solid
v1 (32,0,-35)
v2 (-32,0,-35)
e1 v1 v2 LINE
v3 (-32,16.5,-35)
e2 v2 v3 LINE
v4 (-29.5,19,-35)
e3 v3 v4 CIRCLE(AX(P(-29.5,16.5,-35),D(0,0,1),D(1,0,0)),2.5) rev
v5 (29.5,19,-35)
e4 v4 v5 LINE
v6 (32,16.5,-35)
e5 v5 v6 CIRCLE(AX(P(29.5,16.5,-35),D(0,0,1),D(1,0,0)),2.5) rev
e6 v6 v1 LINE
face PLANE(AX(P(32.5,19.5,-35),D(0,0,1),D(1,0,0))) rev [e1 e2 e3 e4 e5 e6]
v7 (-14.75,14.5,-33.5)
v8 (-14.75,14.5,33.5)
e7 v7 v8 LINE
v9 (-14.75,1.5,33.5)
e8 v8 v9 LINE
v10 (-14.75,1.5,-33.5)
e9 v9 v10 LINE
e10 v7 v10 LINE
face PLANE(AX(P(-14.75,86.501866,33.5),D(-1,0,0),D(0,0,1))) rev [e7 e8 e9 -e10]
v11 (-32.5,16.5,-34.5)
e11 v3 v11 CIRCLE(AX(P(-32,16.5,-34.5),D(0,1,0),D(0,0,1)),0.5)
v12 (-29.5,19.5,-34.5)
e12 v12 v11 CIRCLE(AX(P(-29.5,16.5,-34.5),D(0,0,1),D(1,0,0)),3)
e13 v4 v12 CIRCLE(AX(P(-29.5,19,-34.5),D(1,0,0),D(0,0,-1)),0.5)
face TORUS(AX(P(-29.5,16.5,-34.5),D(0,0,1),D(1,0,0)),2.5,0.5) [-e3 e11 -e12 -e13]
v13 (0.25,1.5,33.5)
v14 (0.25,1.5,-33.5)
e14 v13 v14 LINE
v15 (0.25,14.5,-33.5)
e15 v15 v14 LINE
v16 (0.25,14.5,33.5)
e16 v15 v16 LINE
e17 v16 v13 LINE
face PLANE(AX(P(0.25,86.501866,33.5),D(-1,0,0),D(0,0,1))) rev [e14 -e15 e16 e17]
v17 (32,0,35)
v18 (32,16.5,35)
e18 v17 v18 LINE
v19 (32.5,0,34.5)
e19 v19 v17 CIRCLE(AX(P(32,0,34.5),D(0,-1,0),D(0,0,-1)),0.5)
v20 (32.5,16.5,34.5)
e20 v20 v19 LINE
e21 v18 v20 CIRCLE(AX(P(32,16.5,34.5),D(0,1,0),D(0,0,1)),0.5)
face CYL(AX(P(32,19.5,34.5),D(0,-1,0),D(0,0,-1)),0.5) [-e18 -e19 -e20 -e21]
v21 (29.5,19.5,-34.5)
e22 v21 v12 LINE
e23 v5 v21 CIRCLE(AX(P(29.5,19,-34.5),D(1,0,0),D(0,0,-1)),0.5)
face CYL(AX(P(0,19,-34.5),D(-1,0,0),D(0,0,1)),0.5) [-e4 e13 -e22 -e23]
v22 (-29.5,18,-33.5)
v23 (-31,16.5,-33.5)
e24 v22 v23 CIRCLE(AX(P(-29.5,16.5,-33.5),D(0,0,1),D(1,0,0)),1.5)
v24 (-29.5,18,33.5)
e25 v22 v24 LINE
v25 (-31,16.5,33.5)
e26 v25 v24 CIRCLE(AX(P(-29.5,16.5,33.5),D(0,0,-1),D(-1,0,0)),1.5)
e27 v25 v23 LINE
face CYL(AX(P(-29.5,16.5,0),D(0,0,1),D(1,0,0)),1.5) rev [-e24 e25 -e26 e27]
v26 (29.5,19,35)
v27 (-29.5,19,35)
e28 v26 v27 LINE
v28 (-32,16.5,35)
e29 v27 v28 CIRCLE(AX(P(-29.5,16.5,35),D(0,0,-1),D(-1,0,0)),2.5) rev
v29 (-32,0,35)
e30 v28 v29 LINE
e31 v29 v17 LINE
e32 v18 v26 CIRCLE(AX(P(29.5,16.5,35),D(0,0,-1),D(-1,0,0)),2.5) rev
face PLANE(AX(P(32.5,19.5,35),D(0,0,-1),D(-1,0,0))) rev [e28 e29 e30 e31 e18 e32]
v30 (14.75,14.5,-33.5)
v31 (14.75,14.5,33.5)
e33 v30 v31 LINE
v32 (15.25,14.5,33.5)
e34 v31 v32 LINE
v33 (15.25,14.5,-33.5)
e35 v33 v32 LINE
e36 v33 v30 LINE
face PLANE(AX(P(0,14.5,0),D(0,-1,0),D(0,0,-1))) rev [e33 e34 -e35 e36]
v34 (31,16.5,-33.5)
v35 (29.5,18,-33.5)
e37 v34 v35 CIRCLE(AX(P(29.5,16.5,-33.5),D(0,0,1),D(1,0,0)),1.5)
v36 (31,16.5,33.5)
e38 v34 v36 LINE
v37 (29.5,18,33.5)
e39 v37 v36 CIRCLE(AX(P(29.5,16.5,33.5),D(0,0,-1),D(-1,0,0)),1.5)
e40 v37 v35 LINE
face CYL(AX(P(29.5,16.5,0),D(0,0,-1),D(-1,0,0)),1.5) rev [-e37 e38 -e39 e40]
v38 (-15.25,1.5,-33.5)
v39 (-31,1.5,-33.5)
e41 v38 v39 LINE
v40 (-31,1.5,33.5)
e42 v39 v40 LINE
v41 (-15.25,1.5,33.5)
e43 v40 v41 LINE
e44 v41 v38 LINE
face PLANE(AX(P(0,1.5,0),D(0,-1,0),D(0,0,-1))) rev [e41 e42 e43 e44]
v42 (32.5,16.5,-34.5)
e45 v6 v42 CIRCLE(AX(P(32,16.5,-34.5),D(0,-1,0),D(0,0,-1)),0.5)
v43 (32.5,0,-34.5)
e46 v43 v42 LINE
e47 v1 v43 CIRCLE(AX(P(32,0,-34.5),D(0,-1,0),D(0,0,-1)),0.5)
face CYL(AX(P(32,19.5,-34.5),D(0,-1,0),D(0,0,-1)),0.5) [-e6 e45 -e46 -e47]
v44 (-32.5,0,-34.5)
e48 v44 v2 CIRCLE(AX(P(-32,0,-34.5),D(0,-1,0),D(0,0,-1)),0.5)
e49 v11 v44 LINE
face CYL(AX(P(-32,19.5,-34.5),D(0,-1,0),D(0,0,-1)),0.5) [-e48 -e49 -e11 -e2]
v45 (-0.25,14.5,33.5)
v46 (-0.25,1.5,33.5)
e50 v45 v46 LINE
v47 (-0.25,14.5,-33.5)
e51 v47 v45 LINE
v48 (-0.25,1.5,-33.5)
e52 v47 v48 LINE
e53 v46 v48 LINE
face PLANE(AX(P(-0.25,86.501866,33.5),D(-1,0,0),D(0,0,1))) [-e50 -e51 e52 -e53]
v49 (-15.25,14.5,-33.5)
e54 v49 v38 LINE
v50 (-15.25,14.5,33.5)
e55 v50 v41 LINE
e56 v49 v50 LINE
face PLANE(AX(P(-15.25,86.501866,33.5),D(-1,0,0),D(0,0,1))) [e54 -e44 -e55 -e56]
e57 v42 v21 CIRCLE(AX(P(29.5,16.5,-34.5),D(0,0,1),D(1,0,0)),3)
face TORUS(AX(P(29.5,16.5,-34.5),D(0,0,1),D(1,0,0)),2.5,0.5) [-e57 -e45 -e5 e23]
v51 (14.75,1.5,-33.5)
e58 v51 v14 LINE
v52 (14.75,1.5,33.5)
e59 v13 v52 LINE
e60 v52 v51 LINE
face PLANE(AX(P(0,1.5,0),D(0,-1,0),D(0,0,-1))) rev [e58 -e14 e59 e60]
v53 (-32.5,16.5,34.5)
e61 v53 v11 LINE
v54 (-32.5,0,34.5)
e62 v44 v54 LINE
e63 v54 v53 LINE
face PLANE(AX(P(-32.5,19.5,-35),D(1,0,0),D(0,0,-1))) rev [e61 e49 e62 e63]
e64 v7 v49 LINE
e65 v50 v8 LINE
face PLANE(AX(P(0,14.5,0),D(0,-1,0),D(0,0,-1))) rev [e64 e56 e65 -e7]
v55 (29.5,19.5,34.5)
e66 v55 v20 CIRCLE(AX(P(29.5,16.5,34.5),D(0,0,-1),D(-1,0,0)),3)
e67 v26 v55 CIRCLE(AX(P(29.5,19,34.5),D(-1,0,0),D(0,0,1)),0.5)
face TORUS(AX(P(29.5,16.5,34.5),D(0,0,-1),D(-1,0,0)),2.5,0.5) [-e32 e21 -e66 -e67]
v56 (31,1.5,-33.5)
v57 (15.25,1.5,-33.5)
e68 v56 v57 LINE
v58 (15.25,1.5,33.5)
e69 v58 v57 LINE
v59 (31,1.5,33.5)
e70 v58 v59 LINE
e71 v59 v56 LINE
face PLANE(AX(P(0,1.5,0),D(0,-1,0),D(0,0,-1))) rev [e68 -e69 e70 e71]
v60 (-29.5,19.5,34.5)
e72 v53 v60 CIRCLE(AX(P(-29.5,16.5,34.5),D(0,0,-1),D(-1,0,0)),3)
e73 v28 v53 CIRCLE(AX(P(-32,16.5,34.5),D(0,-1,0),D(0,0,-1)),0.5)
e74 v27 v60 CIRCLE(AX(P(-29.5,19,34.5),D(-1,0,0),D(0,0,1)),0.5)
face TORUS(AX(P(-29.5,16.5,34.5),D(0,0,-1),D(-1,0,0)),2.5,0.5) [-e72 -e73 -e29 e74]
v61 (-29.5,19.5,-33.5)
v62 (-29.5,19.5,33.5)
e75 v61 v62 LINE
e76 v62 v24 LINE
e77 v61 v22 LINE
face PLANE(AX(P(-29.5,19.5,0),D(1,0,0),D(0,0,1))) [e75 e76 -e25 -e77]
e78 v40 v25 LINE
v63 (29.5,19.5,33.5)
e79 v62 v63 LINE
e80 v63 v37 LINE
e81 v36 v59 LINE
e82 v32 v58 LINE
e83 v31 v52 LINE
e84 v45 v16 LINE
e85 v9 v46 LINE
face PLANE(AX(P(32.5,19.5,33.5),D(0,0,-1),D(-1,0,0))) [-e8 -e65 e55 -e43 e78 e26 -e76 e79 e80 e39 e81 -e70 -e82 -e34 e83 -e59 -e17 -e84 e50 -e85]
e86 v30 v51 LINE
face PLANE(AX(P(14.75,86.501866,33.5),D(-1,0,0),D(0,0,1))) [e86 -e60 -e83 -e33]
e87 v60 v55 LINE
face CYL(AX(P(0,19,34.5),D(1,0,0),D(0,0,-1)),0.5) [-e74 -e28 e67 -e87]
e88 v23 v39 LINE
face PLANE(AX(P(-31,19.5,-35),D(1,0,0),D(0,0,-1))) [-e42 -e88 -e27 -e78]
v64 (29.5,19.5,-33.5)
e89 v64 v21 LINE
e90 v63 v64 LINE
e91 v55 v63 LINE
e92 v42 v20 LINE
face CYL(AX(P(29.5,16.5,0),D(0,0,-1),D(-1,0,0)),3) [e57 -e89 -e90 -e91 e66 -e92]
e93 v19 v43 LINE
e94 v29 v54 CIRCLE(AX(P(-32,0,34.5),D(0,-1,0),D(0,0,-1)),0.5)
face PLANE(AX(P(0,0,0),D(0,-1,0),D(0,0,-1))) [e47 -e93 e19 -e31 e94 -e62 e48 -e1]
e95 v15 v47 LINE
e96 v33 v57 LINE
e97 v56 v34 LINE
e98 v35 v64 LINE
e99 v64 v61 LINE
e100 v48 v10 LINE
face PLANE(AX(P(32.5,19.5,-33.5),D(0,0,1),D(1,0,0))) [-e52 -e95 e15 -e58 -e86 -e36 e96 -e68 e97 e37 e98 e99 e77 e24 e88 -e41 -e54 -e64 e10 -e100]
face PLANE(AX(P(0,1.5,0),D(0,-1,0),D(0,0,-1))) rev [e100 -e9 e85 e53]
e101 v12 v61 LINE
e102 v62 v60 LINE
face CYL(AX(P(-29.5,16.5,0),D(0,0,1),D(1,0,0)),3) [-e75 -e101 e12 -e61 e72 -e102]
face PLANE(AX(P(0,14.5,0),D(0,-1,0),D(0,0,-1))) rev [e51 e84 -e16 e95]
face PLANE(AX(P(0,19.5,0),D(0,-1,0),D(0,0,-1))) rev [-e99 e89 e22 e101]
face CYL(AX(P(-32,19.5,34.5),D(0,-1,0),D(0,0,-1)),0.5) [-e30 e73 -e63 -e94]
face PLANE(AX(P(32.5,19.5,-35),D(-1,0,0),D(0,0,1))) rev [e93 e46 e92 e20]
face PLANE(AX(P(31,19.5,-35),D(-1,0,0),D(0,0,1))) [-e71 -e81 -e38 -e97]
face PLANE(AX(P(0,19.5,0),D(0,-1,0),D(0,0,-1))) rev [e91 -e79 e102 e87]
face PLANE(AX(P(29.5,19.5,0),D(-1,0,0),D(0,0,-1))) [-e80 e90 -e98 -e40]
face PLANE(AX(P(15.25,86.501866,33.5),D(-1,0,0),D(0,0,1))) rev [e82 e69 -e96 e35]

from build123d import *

# Parameters (mm, degrees)
SKETCH1_W           = 65
SKETCH1_H           = 70
BOSS_EXTRUDE1_DEPTH = 19.5
FILLET1_R           = 3
FILLET2_R           = 0.5
SHELL1_START        = -33.5
SHELL1_DEPTH        = 67
SKETCH2_W           = 0.5
SKETCH2_H           = 67
EXTRUDE_THIN1_DEPTH = 13
LPATTERN1_COUNT     = 2
LPATTERN1_PITCH     = 15
LPATTERN1_COL_COUNT = 2
LPATTERN1_COL_PITCH = 15


# Read off the part's stored shape, not the designer's step: Shell1
with BuildPart() as part:
    # Sketch1 → Boss-Extrude1 (new body)
    with BuildSketch(Plane(origin=(0, 0, 0), x_dir=(1, 0, 0), z_dir=(0, 1, 0))):
        Rectangle(SKETCH1_W, SKETCH1_H)
    extrude(amount=BOSS_EXTRUDE1_DEPTH)

    # Fillet1
    fillet1_edges = [part.edges().sort_by_distance(p)[0] for p in [
        (32.5, 19.5, 0),
        (-32.5, 19.5, 0),
    ]]
    fillet(fillet1_edges, radius=FILLET1_R)

    # Fillet2
    fillet2_edges = [part.edges().sort_by_distance(p)[0] for p in [
        (0, 19.5, 35),
        (0, 19.5, -35),
        (-32.5, 8.25, -35),
        (32.5, 8.25, -35),
        (-31.621320344, 18.621320344, -35),
        (31.621320344, 18.621320344, -35),
        (32.5, 8.25, 35),
        (-32.5, 8.25, 35),
        (-31.621320344, 18.621320344, 35),
        (31.621320344, 18.621320344, 35),
    ]]
    fillet(fillet2_edges, radius=FILLET2_R)

    # Shell1 outline → Shell1 (cut)
    with BuildSketch(Plane.XY.offset(SHELL1_START)):
        with BuildLine():
            Line((29.5, 18), (29.5, 19.5))
            Line((29.5, 19.5), (-29.5, 19.5))
            Line((-29.5, 19.5), (-29.5, 18))
            ThreePointArc((-29.5, 18), (-30.560660172, 17.560660172), (-31, 16.5))
            Line((-31, 16.5), (-31, 1.5))
            Line((-31, 1.5), (31, 1.5))
            Line((31, 1.5), (31, 16.5))
            ThreePointArc((31, 16.5), (30.560660172, 17.560660172), (29.5, 18))
        make_face()
    extrude(amount=SHELL1_DEPTH, mode=Mode.SUBTRACT)

    # Sketch2 → Extrude-Thin1 (add)
    with BuildSketch(Plane(origin=(0, 1.5, 0), x_dir=(1, 0, 0), z_dir=(0, 1, 0))):
        Rectangle(SKETCH2_W, SKETCH2_H)
    extrude_thin1 = extrude(amount=EXTRUDE_THIN1_DEPTH)

    # LPattern1: Extrude-Thin1 ×2
    with Locations(*[(-i * LPATTERN1_PITCH, 0, 0) for i in range(1, LPATTERN1_COUNT)]):
        add(extrude_thin1)

    # LPattern1 col: Extrude-Thin1 ×2
    with Locations(*[(i * LPATTERN1_COL_PITCH, 0, 0) for i in range(1, LPATTERN1_COL_COUNT)]):
        add(extrude_thin1)


solid = part.part
